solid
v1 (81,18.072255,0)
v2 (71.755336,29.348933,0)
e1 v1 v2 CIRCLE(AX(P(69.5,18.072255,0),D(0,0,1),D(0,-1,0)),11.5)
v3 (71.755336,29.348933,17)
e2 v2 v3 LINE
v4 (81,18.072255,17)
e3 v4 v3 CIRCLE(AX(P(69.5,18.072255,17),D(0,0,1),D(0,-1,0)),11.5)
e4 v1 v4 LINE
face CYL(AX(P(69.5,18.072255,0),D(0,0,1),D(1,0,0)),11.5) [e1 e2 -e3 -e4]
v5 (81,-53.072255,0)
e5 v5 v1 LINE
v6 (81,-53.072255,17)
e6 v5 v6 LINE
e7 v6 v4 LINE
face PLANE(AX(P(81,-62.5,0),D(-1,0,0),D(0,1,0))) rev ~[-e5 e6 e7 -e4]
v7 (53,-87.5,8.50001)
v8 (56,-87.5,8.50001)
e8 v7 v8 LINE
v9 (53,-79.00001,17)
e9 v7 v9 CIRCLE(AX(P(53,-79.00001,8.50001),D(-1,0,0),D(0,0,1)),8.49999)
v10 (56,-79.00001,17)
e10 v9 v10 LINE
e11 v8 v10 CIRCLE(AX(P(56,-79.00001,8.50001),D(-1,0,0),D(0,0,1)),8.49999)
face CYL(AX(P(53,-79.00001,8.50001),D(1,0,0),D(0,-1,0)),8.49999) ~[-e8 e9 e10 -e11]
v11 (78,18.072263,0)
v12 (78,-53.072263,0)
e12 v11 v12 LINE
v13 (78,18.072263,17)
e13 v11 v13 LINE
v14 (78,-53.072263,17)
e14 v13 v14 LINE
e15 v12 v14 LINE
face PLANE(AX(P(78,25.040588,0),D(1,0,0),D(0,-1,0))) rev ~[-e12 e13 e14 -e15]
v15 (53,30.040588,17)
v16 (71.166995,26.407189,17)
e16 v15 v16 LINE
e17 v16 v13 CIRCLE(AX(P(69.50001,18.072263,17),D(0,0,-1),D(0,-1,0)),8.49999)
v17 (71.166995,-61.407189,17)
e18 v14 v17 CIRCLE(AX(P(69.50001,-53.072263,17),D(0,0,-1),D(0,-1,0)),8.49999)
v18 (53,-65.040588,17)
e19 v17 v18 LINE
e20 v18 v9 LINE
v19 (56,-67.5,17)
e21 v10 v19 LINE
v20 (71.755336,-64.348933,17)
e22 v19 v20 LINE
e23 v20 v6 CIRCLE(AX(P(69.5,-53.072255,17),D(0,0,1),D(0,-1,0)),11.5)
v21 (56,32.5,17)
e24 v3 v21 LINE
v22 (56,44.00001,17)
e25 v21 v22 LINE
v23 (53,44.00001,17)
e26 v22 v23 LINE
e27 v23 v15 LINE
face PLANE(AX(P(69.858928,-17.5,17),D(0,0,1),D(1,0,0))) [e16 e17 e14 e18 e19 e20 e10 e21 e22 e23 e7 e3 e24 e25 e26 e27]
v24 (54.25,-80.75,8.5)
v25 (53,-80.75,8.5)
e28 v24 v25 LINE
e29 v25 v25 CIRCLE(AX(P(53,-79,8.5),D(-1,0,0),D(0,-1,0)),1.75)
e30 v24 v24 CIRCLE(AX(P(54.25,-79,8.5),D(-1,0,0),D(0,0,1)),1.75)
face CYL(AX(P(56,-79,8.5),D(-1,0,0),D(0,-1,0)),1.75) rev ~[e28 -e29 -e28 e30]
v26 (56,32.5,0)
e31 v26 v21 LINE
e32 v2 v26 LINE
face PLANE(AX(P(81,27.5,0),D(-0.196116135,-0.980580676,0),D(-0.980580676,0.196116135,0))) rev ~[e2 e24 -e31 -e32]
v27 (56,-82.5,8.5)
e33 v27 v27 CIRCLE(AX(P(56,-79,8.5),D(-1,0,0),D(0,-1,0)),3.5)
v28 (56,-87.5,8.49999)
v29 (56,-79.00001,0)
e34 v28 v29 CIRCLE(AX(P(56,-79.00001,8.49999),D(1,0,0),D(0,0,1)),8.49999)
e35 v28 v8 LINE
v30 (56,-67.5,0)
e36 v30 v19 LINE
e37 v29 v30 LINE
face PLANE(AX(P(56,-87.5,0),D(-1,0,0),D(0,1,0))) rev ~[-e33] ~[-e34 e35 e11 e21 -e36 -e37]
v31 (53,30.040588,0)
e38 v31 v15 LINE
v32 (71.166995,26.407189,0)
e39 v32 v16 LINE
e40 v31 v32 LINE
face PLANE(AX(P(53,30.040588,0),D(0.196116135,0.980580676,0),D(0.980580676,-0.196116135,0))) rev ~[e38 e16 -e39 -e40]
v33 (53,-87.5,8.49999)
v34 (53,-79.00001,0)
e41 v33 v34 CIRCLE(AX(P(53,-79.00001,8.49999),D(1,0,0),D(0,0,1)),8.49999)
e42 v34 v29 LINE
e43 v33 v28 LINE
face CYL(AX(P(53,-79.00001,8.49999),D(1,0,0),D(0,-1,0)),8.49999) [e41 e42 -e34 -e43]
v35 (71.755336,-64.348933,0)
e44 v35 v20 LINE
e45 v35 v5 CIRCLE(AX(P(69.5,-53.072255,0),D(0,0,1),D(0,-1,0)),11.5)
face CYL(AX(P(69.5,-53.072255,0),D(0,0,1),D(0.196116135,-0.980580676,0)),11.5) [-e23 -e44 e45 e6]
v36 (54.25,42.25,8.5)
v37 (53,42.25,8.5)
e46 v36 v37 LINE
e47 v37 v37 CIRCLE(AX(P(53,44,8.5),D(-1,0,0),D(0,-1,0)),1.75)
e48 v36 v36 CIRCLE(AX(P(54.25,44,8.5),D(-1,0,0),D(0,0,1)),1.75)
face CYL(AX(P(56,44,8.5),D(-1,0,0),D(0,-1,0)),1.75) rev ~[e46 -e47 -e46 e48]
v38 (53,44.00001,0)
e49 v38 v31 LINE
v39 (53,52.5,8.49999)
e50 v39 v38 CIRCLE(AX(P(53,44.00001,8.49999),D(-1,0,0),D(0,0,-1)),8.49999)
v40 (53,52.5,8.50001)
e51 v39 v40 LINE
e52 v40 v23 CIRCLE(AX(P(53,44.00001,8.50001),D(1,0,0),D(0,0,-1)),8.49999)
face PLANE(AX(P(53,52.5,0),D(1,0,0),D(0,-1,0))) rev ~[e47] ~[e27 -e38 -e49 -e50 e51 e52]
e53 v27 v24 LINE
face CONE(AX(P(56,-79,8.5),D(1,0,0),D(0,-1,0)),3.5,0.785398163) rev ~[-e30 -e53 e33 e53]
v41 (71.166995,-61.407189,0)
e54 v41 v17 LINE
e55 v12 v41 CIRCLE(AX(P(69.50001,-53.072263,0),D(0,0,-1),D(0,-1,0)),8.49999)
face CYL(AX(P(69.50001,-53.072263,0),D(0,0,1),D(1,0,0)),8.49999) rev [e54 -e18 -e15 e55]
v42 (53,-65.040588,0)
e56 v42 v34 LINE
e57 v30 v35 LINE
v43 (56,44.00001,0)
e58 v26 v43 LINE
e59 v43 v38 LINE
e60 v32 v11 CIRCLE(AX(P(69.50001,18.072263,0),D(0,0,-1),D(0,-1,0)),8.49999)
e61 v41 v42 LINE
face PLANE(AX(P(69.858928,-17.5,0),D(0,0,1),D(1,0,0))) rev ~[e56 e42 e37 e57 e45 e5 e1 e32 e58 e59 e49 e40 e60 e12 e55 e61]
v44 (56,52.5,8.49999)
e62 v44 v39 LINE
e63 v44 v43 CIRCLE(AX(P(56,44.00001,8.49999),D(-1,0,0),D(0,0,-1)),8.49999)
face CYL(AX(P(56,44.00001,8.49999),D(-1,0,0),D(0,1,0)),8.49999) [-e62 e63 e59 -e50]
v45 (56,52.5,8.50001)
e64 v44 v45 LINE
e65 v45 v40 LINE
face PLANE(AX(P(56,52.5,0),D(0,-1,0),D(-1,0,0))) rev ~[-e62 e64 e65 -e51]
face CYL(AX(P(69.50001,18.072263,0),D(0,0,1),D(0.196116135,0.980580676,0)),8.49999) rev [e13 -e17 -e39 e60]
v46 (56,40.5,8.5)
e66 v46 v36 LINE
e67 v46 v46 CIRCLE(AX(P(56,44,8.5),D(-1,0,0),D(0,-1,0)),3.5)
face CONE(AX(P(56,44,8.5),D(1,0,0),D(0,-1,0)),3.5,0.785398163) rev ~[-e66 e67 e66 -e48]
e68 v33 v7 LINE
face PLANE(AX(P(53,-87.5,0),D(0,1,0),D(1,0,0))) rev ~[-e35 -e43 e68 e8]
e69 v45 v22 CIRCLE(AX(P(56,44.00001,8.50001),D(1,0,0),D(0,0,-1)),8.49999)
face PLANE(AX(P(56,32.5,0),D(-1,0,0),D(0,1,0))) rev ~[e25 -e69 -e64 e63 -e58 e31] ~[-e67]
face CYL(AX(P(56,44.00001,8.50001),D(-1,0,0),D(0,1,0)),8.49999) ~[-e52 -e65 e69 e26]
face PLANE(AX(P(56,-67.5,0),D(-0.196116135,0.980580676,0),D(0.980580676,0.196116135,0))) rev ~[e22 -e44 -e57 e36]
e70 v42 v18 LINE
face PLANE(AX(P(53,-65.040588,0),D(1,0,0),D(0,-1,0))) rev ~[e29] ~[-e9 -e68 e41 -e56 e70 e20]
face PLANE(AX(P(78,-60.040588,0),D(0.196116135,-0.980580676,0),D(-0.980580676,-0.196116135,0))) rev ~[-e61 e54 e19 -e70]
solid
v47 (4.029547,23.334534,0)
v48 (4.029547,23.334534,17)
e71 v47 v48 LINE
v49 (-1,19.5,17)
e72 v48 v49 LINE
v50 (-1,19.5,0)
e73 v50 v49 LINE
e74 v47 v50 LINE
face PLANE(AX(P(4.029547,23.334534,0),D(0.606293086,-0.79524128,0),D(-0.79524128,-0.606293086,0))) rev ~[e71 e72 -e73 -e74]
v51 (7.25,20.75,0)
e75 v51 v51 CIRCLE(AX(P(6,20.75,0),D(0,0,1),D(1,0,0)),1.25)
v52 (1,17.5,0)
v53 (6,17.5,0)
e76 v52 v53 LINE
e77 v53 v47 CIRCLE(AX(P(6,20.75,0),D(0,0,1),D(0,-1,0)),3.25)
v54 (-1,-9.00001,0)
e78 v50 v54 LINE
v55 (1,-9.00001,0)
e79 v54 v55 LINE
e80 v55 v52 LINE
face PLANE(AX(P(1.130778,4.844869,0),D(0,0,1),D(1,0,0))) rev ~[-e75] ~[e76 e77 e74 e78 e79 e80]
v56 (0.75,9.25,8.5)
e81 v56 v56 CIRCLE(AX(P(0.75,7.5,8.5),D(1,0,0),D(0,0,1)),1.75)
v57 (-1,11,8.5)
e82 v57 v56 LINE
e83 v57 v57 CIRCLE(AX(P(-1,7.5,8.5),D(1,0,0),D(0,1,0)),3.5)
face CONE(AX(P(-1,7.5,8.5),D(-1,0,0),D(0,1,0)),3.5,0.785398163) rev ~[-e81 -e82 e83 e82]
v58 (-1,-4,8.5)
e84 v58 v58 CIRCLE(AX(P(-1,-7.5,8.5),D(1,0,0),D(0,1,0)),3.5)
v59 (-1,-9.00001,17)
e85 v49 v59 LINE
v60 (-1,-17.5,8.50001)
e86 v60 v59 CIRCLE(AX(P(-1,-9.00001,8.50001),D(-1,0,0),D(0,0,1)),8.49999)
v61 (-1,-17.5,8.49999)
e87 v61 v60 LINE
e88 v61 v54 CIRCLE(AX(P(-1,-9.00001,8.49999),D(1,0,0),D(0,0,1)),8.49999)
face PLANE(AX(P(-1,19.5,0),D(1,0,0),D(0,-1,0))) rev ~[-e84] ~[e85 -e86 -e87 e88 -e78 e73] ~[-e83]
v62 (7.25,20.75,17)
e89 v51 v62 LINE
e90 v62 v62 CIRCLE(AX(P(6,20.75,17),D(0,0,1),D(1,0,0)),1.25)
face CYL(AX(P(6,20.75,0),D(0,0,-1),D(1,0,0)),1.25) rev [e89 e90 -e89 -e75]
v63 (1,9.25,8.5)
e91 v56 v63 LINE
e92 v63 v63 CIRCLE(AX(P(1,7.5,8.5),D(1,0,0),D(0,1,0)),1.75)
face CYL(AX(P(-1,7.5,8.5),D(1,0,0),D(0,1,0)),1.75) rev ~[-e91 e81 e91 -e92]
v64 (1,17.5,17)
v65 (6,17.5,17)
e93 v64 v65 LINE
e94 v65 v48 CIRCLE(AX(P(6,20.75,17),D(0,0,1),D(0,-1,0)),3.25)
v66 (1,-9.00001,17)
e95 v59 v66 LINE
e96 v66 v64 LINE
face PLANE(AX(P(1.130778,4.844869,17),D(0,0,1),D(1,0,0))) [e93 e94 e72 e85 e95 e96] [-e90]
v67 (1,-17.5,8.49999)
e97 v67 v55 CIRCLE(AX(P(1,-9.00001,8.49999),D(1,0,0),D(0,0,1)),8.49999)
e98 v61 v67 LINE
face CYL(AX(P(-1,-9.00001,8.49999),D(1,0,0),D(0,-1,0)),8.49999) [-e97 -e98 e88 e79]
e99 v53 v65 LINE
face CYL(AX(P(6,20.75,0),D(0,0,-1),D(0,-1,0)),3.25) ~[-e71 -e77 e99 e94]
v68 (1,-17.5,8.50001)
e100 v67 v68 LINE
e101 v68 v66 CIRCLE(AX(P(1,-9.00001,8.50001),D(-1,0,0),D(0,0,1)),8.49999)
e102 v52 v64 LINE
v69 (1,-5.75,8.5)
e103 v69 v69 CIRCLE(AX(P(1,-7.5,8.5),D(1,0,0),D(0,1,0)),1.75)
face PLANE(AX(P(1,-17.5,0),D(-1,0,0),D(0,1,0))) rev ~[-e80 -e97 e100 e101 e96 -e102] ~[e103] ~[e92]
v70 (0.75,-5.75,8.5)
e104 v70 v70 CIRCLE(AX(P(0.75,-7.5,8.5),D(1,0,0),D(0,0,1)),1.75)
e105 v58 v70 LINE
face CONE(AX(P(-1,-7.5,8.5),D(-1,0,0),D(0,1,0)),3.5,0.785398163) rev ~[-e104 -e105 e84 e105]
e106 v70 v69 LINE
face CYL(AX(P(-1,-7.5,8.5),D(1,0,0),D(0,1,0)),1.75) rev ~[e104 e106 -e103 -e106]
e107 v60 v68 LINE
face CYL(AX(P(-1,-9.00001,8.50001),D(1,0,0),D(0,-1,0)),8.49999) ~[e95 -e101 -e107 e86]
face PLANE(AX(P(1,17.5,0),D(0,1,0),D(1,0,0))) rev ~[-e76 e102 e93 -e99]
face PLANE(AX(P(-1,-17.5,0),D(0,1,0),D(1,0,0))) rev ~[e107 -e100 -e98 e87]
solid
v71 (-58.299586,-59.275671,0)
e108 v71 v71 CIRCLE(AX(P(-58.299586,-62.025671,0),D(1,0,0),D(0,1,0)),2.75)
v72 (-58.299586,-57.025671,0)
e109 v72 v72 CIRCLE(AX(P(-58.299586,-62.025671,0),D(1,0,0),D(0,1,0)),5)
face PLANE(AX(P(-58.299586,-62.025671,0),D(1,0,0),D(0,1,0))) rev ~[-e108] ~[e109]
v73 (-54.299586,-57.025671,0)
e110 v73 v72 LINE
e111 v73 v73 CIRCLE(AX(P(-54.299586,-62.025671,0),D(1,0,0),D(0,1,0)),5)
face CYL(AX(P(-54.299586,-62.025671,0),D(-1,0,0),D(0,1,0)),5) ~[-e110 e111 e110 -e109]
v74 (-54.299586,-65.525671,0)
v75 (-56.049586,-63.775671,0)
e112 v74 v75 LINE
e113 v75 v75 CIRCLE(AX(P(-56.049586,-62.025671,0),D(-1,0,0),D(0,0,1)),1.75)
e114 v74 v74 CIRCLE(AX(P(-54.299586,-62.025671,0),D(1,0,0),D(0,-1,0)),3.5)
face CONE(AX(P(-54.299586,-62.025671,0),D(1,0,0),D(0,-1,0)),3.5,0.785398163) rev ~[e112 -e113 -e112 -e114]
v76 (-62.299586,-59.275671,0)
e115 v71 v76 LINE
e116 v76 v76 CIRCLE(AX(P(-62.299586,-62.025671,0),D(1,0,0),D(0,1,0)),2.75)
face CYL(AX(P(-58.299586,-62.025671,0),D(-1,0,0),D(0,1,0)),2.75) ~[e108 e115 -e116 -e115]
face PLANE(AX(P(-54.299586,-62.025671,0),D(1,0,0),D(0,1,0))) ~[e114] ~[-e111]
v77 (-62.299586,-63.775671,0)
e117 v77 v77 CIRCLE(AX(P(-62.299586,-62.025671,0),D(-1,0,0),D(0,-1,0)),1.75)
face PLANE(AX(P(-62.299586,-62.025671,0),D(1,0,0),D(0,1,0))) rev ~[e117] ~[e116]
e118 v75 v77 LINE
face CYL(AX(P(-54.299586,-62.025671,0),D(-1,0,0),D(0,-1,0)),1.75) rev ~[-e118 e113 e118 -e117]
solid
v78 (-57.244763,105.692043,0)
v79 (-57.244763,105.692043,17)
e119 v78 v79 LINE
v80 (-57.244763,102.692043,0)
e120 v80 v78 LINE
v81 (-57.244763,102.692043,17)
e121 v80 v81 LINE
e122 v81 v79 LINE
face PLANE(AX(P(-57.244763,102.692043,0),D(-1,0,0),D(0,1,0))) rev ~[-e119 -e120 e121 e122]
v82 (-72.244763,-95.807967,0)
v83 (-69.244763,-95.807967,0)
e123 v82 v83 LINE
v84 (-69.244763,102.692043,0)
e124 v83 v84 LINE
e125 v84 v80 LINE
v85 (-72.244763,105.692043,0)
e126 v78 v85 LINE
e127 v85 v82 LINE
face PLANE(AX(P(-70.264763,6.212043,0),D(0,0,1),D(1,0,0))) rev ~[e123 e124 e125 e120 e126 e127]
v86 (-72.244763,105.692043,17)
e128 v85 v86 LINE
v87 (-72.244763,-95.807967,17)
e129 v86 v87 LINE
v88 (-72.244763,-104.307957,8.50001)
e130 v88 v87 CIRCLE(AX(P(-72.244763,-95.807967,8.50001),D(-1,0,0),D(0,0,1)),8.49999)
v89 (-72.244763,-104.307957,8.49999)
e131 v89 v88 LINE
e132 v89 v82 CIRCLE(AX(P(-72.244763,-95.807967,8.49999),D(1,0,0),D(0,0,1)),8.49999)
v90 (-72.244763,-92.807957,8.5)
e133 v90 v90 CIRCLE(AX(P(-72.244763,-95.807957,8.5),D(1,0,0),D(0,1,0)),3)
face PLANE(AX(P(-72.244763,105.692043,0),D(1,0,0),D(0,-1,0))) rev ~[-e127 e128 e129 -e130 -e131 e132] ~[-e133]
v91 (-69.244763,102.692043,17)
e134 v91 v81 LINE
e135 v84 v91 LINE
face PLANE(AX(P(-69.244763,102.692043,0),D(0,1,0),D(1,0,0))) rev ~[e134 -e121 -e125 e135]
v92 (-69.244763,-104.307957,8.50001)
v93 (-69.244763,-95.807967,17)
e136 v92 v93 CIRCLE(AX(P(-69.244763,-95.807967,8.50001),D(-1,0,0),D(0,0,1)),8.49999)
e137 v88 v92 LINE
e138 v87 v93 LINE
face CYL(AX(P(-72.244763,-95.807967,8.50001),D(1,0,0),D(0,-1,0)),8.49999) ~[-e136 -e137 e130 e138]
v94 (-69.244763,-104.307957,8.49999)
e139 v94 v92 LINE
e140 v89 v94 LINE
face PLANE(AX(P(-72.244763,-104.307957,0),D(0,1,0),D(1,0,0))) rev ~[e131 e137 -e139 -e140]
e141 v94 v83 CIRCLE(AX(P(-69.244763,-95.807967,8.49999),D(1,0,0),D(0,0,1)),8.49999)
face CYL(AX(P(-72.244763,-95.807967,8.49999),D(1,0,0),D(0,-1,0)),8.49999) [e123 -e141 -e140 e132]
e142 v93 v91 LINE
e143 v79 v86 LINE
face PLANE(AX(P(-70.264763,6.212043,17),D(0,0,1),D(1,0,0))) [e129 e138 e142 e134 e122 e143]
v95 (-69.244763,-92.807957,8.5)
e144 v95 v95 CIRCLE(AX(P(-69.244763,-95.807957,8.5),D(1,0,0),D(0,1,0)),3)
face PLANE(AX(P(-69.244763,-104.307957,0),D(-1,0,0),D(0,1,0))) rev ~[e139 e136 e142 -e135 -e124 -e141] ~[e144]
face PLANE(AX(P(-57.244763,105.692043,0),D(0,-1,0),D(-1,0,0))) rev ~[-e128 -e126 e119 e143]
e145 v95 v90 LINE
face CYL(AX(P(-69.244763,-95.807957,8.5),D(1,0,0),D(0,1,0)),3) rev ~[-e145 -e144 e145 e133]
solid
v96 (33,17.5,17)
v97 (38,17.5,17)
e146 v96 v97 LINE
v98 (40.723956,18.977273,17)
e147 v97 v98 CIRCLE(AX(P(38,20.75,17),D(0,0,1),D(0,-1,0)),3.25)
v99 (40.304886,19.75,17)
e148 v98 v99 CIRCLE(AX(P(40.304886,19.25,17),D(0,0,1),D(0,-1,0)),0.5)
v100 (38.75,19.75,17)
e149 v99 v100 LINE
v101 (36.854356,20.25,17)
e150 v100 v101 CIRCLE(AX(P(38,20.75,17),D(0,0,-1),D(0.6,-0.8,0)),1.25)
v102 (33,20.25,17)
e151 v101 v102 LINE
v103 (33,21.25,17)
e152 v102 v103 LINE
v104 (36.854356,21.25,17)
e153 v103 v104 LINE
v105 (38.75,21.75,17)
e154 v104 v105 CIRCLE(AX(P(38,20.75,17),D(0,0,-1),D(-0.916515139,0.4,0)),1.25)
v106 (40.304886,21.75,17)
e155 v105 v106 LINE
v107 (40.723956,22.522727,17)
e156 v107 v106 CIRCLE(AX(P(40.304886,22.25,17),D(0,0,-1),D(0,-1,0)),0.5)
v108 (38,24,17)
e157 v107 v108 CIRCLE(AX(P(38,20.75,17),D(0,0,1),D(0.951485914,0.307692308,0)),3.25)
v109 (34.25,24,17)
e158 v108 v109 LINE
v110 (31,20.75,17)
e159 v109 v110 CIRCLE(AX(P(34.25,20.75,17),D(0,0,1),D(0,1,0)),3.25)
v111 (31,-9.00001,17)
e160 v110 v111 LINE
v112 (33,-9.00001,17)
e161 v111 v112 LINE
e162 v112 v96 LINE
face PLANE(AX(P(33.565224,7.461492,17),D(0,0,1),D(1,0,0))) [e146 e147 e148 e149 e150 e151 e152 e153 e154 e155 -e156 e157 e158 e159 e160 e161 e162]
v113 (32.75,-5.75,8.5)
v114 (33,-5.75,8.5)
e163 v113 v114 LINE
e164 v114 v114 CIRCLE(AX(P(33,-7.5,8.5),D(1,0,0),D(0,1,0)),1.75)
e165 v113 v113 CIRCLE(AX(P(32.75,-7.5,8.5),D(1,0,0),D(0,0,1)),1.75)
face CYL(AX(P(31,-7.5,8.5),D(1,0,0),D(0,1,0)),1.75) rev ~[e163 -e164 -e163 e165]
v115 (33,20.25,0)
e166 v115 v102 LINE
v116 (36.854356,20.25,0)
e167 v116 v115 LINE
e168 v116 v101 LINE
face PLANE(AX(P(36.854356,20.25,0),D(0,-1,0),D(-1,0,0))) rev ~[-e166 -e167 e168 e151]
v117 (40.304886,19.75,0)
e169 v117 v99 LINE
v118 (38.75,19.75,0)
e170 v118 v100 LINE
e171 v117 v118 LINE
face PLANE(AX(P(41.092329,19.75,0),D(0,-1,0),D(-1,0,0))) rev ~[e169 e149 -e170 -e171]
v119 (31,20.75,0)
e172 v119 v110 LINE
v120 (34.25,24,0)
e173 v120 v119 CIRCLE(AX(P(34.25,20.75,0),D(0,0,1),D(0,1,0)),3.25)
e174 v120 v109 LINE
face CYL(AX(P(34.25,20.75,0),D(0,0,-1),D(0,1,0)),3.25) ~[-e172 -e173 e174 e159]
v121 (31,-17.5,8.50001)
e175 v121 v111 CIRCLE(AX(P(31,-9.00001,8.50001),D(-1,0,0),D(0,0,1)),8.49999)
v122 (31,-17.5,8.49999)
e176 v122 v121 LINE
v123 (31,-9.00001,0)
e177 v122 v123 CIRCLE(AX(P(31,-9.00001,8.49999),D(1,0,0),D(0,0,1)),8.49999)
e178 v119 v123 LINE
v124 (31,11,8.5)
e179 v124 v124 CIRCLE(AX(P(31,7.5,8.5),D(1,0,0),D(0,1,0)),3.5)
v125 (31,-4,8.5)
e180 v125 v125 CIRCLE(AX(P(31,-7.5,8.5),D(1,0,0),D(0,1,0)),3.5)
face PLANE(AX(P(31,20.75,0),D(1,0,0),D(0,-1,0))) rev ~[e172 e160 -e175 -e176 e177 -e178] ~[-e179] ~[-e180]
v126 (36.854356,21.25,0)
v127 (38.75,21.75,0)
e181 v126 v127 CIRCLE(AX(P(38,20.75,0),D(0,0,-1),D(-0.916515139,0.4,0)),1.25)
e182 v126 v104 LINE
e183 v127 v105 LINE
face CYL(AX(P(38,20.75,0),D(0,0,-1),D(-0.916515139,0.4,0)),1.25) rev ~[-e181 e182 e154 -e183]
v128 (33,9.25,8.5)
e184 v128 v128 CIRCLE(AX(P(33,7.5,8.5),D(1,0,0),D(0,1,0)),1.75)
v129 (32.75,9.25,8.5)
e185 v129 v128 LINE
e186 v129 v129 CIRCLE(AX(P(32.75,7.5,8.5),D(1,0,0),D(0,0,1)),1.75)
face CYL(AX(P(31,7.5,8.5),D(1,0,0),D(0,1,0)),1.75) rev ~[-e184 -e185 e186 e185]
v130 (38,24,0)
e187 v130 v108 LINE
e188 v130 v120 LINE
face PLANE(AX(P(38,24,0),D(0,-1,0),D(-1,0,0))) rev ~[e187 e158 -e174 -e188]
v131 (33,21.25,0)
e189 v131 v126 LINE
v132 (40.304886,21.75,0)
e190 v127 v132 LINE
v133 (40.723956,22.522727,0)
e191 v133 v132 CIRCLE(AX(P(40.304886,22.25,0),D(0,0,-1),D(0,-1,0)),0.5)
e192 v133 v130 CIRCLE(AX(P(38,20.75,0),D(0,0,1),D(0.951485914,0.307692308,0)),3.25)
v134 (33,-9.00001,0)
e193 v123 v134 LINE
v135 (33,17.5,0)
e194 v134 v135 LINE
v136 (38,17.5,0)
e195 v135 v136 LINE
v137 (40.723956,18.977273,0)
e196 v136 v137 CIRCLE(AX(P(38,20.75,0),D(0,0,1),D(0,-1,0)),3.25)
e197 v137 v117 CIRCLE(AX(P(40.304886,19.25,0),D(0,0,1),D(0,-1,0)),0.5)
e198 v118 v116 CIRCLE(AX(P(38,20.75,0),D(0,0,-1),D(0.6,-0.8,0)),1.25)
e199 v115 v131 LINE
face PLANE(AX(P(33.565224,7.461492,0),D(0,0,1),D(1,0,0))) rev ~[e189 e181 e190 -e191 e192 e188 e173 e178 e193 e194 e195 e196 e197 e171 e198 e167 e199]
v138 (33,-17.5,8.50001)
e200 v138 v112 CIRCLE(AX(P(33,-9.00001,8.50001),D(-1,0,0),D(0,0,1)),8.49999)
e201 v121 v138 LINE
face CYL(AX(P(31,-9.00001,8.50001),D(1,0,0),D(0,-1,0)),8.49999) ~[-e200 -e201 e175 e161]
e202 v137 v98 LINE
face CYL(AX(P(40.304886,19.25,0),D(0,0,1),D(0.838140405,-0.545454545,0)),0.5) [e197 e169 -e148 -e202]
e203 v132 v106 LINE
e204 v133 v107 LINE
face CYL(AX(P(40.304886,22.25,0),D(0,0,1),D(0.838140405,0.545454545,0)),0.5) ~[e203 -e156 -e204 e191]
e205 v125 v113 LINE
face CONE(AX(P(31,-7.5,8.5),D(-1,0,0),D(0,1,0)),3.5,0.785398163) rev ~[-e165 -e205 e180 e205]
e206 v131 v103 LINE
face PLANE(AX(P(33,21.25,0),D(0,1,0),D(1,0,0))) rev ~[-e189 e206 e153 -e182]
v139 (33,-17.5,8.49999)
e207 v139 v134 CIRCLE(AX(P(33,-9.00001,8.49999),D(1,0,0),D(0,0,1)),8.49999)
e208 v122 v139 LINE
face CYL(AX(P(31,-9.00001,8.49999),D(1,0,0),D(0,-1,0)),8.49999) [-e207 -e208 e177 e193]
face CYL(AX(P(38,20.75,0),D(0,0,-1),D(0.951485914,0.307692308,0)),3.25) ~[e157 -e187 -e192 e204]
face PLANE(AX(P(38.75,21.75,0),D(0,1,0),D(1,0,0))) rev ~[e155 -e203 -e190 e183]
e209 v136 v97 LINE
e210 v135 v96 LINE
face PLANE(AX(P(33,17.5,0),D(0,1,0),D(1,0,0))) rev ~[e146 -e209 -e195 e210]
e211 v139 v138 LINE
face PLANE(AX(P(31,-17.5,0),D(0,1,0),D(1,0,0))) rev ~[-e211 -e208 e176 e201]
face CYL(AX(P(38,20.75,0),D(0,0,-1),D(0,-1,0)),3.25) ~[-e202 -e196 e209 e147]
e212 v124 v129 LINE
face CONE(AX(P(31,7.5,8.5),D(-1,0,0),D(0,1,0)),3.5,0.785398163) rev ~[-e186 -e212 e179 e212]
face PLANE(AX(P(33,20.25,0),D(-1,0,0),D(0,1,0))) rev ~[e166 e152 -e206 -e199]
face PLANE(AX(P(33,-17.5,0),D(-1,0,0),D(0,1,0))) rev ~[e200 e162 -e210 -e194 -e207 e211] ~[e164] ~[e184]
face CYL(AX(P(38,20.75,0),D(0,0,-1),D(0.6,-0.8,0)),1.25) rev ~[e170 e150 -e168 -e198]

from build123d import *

# Parameters (mm, degrees)
F0_R                 = 1.25
F1_DEPTH             = 17
F4_R                 = 8.49999
F4_2_R               = 8.49999
F4_3_R               = 8.49999
F4_4_R               = 8.49999
F5_R                 = 0.5
F7_D                 = 3.5
F7_DEPTH             = 20
F7_CSINK_D           = 7
F7_CSINK_ANGLE       = 90
F7_TIP               = 1.0515060833
F7_ON_F3_D           = 3.5
F7_ON_F3_DEPTH       = 20
F7_ON_F3_CSINK_D     = 7
F7_ON_F3_CSINK_ANGLE = 90
F7_ON_F3_TIP         = 1.0515060833
F7_ON_F6_D           = 3.5
F7_ON_F6_DEPTH       = 20
F7_ON_F6_CSINK_D     = 7
F7_ON_F6_CSINK_ANGLE = 90
F7_ON_F6_TIP         = 1.0515060833
F8_R                 = 11.5
F9_R                 = 3
F10_DEPTH            = 25
F14_D                = 3.5
F14_DEPTH            = 20
F14_CSINK_D          = 7
F14_CSINK_ANGLE      = 90
F14_TIP              = 1.0515060833


# Not quite as in the source:
# - a fillet or chamfer is up to 0.001 mm smaller than in the source, because OpenCascade refuses the exact size


with BuildPart() as f1:
    # F0 (on Top) → F1 (new body)
    with BuildSketch(Plane.XY):
        with BuildLine():
            Line((1, 17.5), (6, 17.5))
            ThreePointArc((6, 17.5), (9.0791424151, 21.7898951811), (4.0295474712, 23.3345341614))
            Line((4.0295474712, 23.3345341614), (-1, 19.5))
            Line((-1, 19.5), (-1, -17.5))
            Line((-1, -17.5), (1, -17.5))
            Line((1, -17.5), (1, 17.5))
        make_face()
        with Locations((6, 20.75)):
            Circle(F0_R, mode=Mode.SUBTRACT)
    extrude(amount=F1_DEPTH)

    # F4 (radius 8.5 in the source; OpenCascade refuses exactly that, so slightly less here)
    f4_edges = [f1.edges().sort_by_distance(p)[0] for p in [
        (0, -17.5, 17),
        (0, -17.5, 0),
    ]]
    fillet(f4_edges, radius=F4_R)

    # F7
    with Locations(Plane(origin=(-1, 0, 0), x_dir=(0, -1, 0), z_dir=(-1, 0, 0))):
        with Locations((7.5, 8.5), (-7.5, 8.5)):
            CounterSinkHole(F7_D / 2, F7_CSINK_D / 2, depth=F7_DEPTH, counter_sink_angle=F7_CSINK_ANGLE)
            with Locations((0, 0, -(F7_DEPTH + F7_TIP / 2))):  # 118° drill point
                Cone(0, F7_D / 2, F7_TIP, mode=Mode.SUBTRACT)


with BuildPart() as f1b:
    # F0 (on Top) → F1, piece 2 (new body)
    with BuildSketch(Plane.XY):
        with BuildLine():
            Line((33, 17.5), (38, 17.5))
            ThreePointArc((38, 17.5), (39.9121323176, 18.1220254948), (41.0923292192, 19.75))
            Line((41.0923292192, 19.75), (38.75, 19.75))
            ThreePointArc((38.75, 19.75), (37.681199861, 19.5413369074), (36.8543560763, 20.25))
            Line((36.8543560763, 20.25), (33, 20.25))
            Line((33, 20.25), (33, 21.25))
            Line((33, 21.25), (36.8543560763, 21.25))
            ThreePointArc((36.8543560763, 21.25), (37.681199861, 21.9586630926), (38.75, 21.75))
            Line((38.75, 21.75), (41.0923292192, 21.75))
            ThreePointArc((41.0923292192, 21.75), (39.9121323176, 23.3779745052), (38, 24))
            Line((38, 24), (34.25, 24))
            ThreePointArc((34.25, 24), (31.9519029611, 23.0480970389), (31, 20.75))
            Line((31, 20.75), (31, -17.5))
            Line((31, -17.5), (33, -17.5))
            Line((33, -17.5), (33, 17.5))
        make_face()
    extrude(amount=F1_DEPTH)

    # F4#2 (radius 8.5 in the source; OpenCascade refuses exactly that, so slightly less here)
    f4_2_edges = [f1b.edges().sort_by_distance(p)[0] for p in [
        (32, -17.5, 17),
        (32, -17.5, 0),
    ]]
    fillet(f4_2_edges, radius=F4_2_R)

    # F5
    f5_edges = [f1b.edges().sort_by_distance(p)[0] for p in [
        (41.092329, 19.75, 8.5),
        (41.092329, 21.75, 8.5),
    ]]
    fillet(f5_edges, radius=F5_R)

    # F7 on F3
    with Locations(Plane(origin=(31, 0, 0), x_dir=(0, -1, 0), z_dir=(-1, 0, 0))):
        with Locations((7.5, 8.5), (-7.5, 8.5)):
            CounterSinkHole(F7_ON_F3_D / 2, F7_ON_F3_CSINK_D / 2, depth=F7_ON_F3_DEPTH, counter_sink_angle=F7_ON_F3_CSINK_ANGLE)
            with Locations((0, 0, -(F7_ON_F3_DEPTH + F7_ON_F3_TIP / 2))):  # 118° drill point
                Cone(0, F7_ON_F3_D / 2, F7_ON_F3_TIP, mode=Mode.SUBTRACT)


with BuildPart() as f1c:
    # F0 (on Top) → F1, piece 3 (new body)
    with BuildSketch(Plane.XY):
        Polygon((56, 32.5), (56, 52.5), (53, 52.5), (53, 30.0405882918), (78, 25.0405882918), (78, -17.5), (78, -60.0405882918), (53, -65.0405882918), (53, -87.5), (56, -87.5), (56, -67.5), (81, -62.5), (81, -17.5), (81, 27.5), align=None)
    extrude(amount=F1_DEPTH)

    # F4#3 (radius 8.5 in the source; OpenCascade refuses exactly that, so slightly less here)
    f4_3_edges = [f1c.edges().sort_by_distance(p)[0] for p in [
        (54.5, 52.5, 17),
        (54.5, 52.5, 0),
        (54.5, -87.5, 17),
        (54.5, -87.5, 0),
        (78, -60.040588, 8.5),
        (78, 25.040588, 8.5),
    ]]
    fillet(f4_3_edges, radius=F4_3_R)

    # F7 on F6
    with Locations(Plane.YZ.offset(56)):
        with Locations((44, 8.5), (-79, 8.5)):
            CounterSinkHole(F7_ON_F6_D / 2, F7_ON_F6_CSINK_D / 2, depth=F7_ON_F6_DEPTH, counter_sink_angle=F7_ON_F6_CSINK_ANGLE)
            with Locations((0, 0, -(F7_ON_F6_DEPTH + F7_ON_F6_TIP / 2))):  # 118° drill point
                Cone(0, F7_ON_F6_D / 2, F7_ON_F6_TIP, mode=Mode.SUBTRACT)

    # F8
    f8_edges = [f1c.edges().sort_by_distance(p)[0] for p in [
        (81, -62.5, 8.5),
        (81, 27.5, 8.5),
    ]]
    fillet(f8_edges, radius=F8_R)


with BuildPart() as f1d:
    # F0 (on Top) → F1, piece 4 (new body)
    with BuildSketch(Plane.XY):
        Polygon((-72.2447633743, 105.6920430064), (-72.2447633743, -104.3079569936), (-69.2447633743, -104.3079569936), (-69.2447633743, 102.6920430064), (-57.2447633743, 102.6920430064), (-57.2447633743, 105.6920430064), align=None)
    extrude(amount=F1_DEPTH)

    # F4#4 (radius 8.5 in the source; OpenCascade refuses exactly that, so slightly less here)
    f4_4_edges = [f1d.edges().sort_by_distance(p)[0] for p in [
        (-70.744763, -104.307957, 17),
        (-70.744763, -104.307957, 0),
    ]]
    fillet(f4_4_edges, radius=F4_4_R)

    # F9 (on face) → F10 (cut)
    with BuildSketch(Plane.YZ.offset(-69.2447633743)):
        with Locations((-95.8079569936, 8.5)):
            Circle(F9_R)
    extrude(amount=-F10_DEPTH, mode=Mode.SUBTRACT)


with BuildPart() as f12:
    # F11 (on Top) → F12 (revolve)
    with BuildSketch(Plane.XY):
        Polygon((-62.2995859704, -59.2756714114), (-62.2995859704, -62.0256714114), (-54.2995859704, -62.0256714114), (-54.2995859704, -57.0256714114), (-58.2995859704, -57.0256714114), (-58.2995859704, -59.2756714114), align=None)
    revolve(axis=Axis((-56.4878471196, -62.0256714114, 0), (1, 0, 0)))

    # F14
    with Locations(Plane.YZ.offset(-54.2995859704)):
        with Locations((-62.0256714114, 0)):
            CounterSinkHole(F14_D / 2, F14_CSINK_D / 2, depth=F14_DEPTH, counter_sink_angle=F14_CSINK_ANGLE)
            with Locations((0, 0, -(F14_DEPTH + F14_TIP / 2))):  # 118° drill point
                Cone(0, F14_D / 2, F14_TIP, mode=Mode.SUBTRACT)


solid = Compound([f1.part, f1b.part, f1c.part, f1d.part, f12.part])
